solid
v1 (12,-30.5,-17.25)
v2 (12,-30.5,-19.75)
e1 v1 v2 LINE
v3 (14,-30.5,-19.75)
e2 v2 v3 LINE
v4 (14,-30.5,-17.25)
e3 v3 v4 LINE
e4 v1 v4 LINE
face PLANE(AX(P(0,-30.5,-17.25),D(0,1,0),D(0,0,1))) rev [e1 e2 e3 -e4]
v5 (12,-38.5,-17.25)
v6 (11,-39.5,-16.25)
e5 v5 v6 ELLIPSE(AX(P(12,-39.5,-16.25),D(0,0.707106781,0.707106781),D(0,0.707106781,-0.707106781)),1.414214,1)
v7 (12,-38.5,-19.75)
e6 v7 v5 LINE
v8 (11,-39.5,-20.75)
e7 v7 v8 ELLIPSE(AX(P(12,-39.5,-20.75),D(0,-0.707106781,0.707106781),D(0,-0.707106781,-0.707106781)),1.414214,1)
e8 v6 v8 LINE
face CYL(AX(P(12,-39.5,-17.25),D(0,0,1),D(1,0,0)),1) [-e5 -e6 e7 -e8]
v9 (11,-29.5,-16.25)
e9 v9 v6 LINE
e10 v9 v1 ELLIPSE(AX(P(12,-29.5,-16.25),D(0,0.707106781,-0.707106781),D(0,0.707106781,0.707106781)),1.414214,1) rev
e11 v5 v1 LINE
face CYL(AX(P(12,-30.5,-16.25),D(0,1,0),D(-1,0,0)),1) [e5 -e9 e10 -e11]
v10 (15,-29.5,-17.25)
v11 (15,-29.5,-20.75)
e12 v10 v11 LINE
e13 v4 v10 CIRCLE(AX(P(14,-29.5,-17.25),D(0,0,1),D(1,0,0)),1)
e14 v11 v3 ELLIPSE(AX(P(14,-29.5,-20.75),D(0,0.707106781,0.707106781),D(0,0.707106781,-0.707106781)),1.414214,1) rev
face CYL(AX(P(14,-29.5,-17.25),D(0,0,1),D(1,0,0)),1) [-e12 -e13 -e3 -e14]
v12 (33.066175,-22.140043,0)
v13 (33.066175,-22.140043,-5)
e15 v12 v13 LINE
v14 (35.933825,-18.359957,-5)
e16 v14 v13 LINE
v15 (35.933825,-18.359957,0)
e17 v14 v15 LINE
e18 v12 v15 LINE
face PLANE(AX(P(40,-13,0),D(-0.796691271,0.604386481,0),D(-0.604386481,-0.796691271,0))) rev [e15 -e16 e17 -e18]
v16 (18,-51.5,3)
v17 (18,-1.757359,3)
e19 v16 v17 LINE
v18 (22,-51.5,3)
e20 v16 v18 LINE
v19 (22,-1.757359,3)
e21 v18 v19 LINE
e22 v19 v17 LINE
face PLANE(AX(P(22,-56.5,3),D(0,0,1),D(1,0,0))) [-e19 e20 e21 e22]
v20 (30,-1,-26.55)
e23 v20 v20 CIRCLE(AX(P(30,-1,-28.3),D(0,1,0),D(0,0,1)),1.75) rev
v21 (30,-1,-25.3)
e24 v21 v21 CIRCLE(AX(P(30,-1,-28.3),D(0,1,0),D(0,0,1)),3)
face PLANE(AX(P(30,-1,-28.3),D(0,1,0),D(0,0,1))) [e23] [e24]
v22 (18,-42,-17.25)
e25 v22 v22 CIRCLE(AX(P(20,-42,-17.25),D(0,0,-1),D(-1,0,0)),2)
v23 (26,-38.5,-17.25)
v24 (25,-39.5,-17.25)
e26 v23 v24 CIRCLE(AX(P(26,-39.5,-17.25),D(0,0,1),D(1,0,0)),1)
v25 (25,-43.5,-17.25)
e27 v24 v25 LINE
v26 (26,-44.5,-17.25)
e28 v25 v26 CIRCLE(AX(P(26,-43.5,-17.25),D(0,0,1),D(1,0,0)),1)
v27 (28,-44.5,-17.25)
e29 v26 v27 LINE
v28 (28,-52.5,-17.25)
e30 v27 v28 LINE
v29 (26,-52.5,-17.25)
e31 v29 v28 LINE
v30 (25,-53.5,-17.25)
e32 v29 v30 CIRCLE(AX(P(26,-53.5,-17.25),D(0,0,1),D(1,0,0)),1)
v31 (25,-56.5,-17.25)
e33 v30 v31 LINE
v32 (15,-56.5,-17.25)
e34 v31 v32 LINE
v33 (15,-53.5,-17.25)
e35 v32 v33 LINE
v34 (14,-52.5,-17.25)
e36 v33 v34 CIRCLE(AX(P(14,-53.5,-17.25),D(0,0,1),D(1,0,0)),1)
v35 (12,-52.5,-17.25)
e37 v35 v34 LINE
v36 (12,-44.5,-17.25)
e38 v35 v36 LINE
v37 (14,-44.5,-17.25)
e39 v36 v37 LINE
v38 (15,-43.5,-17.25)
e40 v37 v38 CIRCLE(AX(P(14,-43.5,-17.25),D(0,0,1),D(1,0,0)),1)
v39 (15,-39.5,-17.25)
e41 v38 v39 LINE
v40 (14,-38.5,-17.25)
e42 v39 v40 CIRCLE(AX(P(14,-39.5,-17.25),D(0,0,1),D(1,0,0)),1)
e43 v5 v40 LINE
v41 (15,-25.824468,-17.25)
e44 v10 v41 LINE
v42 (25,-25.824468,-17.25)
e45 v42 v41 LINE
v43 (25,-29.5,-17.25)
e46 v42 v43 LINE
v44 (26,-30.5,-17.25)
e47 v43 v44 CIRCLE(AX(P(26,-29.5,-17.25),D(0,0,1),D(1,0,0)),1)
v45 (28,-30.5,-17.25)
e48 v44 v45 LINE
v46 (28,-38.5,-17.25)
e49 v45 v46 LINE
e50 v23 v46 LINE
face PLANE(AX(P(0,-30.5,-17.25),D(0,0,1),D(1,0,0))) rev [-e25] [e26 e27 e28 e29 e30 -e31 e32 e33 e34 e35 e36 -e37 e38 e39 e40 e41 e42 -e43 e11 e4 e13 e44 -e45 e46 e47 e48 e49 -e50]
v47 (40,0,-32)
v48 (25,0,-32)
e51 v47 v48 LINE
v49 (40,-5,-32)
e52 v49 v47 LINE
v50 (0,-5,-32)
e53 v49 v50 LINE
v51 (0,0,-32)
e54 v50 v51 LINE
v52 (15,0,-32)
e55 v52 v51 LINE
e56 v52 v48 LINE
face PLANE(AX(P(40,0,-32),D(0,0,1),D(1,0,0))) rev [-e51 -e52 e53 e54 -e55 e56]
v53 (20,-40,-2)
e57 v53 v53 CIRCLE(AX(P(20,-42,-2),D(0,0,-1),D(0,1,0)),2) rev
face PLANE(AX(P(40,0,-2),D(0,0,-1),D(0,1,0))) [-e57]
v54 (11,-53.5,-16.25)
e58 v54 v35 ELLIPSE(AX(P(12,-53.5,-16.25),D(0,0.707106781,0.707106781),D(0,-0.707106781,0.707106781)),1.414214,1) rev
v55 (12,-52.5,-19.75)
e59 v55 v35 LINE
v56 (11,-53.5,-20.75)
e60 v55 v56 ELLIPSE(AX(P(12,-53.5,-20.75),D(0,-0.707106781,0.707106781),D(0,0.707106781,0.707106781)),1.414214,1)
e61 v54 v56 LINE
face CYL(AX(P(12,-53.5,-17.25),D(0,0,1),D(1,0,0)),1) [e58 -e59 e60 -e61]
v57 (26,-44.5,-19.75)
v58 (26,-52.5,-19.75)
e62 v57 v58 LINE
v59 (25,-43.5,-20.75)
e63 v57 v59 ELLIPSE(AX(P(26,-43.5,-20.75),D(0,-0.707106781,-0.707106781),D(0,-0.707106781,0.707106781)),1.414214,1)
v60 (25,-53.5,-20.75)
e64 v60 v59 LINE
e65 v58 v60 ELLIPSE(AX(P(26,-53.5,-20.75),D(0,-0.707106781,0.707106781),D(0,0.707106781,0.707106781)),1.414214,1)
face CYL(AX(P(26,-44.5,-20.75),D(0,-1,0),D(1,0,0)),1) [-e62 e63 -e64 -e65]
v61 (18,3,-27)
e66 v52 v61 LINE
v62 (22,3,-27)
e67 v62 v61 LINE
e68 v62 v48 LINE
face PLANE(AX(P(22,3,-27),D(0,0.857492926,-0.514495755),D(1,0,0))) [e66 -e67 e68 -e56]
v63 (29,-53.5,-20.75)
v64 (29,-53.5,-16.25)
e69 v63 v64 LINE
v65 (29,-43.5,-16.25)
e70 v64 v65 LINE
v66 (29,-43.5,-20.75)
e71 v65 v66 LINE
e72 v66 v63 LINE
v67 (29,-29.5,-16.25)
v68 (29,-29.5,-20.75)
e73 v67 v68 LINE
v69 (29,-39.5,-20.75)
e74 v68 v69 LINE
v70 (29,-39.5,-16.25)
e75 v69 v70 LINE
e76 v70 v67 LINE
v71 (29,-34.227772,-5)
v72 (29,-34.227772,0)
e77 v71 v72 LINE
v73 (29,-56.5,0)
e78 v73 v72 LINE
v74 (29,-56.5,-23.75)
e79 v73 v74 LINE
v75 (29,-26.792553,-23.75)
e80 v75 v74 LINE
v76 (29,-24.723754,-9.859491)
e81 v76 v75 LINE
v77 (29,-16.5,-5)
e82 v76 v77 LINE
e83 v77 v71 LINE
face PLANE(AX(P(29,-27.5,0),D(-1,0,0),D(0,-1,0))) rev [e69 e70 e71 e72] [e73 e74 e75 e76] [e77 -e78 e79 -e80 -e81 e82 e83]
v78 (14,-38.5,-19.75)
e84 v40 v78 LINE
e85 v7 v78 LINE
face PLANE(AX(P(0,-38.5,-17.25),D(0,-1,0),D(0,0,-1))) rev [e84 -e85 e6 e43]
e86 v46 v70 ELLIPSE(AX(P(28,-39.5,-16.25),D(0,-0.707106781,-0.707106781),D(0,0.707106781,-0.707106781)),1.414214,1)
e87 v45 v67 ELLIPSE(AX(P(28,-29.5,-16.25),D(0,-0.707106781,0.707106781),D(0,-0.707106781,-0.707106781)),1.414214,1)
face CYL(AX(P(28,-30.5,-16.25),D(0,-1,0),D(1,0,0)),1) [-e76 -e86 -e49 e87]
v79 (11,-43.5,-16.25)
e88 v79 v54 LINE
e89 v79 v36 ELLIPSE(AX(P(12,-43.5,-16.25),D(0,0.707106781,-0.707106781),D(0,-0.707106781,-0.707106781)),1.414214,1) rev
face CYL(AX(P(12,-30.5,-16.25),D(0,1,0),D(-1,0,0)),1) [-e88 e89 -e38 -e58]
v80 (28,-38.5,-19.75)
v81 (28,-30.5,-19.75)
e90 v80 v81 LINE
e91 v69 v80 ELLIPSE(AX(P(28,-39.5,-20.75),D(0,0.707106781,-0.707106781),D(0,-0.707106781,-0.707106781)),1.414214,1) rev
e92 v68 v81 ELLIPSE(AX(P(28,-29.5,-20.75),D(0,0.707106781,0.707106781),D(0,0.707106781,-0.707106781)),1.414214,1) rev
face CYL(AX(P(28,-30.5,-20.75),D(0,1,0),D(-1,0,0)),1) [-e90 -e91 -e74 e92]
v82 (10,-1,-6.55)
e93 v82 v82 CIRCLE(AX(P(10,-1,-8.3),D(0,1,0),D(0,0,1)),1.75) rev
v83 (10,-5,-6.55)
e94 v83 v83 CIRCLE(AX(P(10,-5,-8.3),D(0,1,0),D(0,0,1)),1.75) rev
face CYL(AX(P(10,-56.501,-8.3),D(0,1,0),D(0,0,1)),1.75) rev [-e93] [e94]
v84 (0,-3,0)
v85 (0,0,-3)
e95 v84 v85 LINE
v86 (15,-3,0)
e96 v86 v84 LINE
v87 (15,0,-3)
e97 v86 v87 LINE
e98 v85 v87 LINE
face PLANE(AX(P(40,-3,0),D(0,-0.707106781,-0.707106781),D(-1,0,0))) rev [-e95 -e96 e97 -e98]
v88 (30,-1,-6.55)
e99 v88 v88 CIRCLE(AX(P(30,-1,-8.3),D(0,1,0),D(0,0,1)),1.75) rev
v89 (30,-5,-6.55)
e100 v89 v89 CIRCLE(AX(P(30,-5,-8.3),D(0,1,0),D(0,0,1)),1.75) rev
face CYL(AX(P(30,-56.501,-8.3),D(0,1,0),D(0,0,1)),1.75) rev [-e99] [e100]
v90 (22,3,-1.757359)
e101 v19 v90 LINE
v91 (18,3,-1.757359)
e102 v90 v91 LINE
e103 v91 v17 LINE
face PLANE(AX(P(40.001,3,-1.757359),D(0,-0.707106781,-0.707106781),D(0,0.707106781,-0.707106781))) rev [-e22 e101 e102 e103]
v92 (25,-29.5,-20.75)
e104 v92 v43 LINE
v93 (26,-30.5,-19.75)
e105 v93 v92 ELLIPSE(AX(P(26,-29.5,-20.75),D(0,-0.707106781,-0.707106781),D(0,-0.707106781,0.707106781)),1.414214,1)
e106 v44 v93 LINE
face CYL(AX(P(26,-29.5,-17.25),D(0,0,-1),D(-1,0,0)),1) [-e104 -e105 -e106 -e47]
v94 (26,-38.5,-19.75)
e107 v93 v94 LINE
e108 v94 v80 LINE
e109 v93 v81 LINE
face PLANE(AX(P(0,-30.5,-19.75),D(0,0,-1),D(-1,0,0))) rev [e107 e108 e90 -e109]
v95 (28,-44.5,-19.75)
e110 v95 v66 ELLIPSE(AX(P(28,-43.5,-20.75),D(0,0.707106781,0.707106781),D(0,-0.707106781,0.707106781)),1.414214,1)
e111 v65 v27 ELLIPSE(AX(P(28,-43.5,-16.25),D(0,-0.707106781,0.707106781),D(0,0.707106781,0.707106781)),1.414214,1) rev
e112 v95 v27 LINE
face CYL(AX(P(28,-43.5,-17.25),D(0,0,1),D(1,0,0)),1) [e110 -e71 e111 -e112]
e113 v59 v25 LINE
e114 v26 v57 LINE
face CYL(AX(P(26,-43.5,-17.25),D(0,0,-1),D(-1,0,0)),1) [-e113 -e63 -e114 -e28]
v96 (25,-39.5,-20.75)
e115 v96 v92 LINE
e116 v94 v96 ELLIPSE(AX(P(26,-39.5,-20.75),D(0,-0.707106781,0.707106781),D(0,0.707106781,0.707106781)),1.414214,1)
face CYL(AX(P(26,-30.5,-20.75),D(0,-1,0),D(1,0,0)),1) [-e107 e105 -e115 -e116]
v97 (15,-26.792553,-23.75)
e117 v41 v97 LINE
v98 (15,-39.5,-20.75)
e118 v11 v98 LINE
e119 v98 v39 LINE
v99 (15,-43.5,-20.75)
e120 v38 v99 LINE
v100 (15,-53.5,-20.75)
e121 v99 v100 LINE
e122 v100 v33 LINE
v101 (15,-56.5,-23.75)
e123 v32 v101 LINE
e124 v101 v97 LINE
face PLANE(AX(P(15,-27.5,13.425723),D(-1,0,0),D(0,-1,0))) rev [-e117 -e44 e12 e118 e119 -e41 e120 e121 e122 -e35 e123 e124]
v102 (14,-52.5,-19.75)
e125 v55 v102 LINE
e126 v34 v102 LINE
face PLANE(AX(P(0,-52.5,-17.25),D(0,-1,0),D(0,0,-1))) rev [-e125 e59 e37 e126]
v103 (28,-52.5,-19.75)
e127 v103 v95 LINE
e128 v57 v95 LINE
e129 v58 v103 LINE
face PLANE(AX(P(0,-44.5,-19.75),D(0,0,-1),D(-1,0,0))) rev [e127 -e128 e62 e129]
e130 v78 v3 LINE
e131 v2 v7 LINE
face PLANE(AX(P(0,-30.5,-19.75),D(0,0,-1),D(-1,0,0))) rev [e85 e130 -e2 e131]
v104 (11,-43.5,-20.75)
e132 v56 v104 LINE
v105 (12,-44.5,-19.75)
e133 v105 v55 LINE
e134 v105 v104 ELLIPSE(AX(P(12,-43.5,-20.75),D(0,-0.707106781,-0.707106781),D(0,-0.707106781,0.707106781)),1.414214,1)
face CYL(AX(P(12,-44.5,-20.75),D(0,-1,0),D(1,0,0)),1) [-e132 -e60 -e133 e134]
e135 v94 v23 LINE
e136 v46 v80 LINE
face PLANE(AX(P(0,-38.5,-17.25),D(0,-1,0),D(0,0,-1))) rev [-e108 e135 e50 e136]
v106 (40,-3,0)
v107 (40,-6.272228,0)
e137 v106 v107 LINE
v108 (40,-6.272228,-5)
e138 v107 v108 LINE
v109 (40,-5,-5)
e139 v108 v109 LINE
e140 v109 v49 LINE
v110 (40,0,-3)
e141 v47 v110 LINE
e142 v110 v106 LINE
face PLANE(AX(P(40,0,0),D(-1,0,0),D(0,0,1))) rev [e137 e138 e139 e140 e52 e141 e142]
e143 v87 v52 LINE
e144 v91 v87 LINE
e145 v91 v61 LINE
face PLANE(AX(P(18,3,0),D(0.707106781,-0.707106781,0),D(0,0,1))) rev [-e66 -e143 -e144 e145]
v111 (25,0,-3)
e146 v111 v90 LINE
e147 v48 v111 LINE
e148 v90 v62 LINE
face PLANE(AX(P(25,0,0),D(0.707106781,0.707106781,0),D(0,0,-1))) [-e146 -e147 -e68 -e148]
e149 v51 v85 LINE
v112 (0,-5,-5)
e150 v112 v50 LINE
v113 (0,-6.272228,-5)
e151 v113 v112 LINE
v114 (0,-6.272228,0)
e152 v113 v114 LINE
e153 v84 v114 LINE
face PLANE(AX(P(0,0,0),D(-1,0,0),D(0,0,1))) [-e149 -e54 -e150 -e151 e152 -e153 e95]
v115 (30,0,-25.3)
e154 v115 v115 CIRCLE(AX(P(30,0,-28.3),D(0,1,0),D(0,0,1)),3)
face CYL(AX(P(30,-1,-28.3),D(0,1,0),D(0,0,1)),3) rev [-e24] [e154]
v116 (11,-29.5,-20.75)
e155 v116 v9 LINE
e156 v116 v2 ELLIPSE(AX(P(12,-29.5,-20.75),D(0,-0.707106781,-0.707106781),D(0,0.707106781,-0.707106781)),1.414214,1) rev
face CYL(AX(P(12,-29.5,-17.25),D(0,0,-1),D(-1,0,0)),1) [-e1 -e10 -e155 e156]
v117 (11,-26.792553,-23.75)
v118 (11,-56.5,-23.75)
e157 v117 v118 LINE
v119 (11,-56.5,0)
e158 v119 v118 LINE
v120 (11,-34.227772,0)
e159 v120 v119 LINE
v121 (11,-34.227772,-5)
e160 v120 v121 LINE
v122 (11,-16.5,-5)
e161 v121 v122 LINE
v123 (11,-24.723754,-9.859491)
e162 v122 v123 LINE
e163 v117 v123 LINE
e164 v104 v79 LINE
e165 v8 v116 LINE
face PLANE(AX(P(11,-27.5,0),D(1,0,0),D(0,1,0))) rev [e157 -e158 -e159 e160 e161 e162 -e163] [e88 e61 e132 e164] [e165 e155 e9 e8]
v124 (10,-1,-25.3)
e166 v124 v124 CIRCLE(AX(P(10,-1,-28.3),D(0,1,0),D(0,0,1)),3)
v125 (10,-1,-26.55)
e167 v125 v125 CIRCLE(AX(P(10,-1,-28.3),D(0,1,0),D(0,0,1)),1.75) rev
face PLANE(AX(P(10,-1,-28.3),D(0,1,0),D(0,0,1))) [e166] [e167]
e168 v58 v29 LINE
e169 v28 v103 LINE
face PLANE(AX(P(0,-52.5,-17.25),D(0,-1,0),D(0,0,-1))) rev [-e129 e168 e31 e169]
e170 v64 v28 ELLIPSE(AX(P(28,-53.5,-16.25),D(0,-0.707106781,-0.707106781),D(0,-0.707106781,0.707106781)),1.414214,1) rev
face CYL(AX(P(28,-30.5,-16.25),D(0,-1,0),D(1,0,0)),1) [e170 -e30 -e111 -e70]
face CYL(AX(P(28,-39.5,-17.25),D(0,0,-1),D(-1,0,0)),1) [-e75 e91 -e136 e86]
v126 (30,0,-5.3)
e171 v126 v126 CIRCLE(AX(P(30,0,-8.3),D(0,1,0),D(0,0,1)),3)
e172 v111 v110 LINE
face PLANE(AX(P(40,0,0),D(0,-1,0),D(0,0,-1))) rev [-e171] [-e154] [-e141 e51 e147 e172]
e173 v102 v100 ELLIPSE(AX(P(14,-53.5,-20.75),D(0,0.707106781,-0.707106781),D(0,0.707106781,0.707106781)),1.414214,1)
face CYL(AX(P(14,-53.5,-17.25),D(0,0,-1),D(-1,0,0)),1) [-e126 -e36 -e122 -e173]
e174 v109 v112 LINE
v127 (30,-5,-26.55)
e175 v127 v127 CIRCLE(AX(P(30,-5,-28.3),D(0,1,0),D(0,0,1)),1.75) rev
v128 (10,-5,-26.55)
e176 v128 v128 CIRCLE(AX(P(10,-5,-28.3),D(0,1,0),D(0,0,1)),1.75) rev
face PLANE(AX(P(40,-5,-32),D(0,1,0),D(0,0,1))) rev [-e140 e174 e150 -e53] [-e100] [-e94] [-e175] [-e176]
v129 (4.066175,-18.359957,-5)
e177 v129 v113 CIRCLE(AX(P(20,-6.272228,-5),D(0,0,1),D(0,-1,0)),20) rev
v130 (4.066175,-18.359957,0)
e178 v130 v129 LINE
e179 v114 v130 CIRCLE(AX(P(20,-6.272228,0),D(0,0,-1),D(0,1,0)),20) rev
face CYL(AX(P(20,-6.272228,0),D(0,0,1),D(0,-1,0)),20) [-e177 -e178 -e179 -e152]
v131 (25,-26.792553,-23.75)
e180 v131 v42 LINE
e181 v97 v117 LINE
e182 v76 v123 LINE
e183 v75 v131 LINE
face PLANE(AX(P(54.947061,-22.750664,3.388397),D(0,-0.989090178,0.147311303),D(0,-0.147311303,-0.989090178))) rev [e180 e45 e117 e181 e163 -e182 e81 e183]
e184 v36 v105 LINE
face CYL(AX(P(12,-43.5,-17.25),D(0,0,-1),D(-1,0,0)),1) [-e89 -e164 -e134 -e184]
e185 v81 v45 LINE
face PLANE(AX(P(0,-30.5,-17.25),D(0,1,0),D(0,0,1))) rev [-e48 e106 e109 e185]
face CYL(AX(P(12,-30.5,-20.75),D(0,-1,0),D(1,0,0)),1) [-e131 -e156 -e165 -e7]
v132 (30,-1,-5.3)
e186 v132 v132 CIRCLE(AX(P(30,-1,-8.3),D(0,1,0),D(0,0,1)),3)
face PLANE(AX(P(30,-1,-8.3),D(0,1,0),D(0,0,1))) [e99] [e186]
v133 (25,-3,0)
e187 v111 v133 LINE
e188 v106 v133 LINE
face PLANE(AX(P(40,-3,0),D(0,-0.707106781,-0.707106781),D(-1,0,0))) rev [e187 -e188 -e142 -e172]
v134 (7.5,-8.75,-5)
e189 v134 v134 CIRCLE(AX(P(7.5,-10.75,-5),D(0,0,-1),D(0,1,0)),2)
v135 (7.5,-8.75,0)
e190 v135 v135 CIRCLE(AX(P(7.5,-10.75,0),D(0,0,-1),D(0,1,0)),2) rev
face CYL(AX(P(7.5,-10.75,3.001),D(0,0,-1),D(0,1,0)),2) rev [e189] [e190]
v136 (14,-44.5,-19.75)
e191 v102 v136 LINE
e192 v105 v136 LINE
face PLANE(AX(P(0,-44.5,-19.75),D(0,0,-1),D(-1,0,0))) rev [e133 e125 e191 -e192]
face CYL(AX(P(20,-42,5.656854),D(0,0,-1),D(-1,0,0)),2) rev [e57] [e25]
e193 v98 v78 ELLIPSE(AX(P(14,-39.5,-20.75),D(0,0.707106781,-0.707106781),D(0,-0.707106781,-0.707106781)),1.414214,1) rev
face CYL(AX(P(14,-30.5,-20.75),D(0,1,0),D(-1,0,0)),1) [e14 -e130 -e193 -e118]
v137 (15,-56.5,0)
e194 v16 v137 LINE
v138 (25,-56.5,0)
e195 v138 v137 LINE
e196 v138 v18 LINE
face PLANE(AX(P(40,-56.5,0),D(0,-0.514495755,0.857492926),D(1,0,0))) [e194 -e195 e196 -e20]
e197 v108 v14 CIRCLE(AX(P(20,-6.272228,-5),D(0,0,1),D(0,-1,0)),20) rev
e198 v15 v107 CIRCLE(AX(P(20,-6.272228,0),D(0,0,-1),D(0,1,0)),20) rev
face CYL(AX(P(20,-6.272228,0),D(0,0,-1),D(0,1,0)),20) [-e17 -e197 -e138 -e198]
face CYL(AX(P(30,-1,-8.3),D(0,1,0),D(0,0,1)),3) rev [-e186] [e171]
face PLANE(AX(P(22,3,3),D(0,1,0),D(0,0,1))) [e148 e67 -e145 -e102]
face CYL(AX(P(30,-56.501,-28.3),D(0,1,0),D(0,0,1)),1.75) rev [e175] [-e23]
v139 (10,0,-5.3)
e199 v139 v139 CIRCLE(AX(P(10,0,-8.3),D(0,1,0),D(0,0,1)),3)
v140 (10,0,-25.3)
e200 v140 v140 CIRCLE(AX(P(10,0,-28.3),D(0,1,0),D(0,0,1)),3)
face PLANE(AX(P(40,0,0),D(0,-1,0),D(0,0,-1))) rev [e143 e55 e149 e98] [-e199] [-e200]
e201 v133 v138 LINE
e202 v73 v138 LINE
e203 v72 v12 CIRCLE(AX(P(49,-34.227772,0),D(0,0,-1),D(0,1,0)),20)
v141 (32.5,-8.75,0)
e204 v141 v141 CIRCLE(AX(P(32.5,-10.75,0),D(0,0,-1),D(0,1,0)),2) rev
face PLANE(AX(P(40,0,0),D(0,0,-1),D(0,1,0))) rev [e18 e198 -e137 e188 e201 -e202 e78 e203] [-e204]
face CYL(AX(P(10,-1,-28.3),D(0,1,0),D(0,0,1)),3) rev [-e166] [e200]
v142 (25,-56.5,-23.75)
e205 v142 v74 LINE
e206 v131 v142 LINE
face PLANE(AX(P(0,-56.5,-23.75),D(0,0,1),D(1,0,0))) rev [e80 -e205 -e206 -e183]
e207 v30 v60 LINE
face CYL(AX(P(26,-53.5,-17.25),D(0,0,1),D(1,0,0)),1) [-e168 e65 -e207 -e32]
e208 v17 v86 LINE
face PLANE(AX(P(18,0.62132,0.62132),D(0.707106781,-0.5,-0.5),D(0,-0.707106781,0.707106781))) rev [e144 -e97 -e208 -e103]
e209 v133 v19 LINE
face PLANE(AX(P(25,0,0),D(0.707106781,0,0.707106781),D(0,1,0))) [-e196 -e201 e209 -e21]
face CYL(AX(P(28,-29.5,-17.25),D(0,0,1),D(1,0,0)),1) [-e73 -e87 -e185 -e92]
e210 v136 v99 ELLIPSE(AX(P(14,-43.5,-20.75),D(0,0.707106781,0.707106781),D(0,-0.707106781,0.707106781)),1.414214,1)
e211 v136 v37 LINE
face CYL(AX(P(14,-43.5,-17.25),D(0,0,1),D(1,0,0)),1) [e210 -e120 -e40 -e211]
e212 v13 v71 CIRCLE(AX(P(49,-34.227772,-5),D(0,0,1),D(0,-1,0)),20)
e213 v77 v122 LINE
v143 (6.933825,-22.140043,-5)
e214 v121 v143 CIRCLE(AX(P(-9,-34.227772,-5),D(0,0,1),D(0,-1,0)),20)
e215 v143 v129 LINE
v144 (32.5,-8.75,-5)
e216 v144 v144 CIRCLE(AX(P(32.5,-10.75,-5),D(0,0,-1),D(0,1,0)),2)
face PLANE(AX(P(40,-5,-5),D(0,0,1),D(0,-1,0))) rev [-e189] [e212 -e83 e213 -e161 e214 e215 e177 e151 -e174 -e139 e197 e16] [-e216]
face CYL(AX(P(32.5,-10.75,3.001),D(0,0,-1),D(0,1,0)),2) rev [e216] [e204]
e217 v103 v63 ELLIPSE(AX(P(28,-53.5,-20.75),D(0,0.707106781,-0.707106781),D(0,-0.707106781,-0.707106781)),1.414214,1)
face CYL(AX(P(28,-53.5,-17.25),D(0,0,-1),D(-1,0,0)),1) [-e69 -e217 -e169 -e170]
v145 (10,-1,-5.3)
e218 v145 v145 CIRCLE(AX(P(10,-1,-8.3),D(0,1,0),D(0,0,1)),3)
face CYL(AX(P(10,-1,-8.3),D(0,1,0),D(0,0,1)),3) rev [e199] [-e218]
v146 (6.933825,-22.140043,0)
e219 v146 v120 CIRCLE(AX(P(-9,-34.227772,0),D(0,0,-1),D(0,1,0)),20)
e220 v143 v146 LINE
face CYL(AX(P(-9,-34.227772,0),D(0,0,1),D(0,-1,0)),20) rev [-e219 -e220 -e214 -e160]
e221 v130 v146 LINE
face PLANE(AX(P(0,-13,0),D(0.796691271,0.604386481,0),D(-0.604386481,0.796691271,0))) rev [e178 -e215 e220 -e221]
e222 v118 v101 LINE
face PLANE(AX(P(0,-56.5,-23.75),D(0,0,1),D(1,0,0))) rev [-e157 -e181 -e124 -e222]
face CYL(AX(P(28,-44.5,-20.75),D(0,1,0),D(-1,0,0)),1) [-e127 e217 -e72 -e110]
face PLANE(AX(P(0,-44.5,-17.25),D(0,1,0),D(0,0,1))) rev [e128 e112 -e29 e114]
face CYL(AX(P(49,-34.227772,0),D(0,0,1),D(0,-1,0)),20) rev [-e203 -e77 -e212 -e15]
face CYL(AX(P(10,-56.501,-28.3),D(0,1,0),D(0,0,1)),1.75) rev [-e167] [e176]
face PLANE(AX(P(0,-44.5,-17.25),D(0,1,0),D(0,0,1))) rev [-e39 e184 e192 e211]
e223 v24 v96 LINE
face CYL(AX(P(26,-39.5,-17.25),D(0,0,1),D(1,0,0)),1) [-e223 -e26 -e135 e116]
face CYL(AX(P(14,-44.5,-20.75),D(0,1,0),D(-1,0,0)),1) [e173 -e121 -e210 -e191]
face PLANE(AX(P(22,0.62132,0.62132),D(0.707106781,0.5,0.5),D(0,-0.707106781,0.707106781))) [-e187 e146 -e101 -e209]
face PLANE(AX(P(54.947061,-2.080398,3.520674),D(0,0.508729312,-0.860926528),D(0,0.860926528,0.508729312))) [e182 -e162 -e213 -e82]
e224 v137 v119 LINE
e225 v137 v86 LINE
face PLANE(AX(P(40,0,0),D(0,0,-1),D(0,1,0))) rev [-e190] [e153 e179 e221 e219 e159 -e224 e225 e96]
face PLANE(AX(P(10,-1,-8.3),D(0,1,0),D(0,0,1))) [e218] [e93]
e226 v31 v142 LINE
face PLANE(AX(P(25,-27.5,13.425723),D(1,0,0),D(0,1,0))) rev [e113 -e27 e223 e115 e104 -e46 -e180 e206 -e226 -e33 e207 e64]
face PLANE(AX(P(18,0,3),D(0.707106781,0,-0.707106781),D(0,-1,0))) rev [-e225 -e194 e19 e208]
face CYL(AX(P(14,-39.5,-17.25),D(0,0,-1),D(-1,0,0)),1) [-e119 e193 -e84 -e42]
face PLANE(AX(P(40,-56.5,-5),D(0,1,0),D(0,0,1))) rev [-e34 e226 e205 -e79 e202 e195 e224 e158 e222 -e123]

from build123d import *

# Parameters (mm, degrees)
BOSS_EXTRUDE1_DEPTH      = 40
SKETCH2_W                = 40
SKETCH2_H                = 29
BOSS_EXTRUDE2_DEPTH      = 23.5
SKETCH3_W                = 2.5
SKETCH3_H                = 8
CUT_EXTRUDE1_DEPTH       = 77.264342913
CUT_EXTRUDE2_REACH       = 76.863
SKETCH4_W                = 10
SKETCH4_H                = 29
CUT_EXTRUDE3_DEPTH       = 75.863208587
FILLET1_R                = 20
SKETCH6_R                = 2
CUT_EXTRUDE4_DEPTH       = 15.25
CUT_EXTRUDE5_REACH       = 78.264
SKETCH7_R                = 1.75
SKETCH8_R                = 3
CUT_EXTRUDE6_DEPTH       = 1
BOSS_EXTRUDE4_DEPTH      = 2
BOSS_EXTRUDE4_DEPTH_BACK = 2
CHAMFER1_SIZE            = 3
CHAMFER1_SIZE2           = 5
CHAMFER2_SIZE            = 5
CHAMFER2_SIZE2           = 3
CHAMFER3_SIZE            = 3
CHAMFER4_SIZE            = 3
CUT_EXTRUDE7_REACH       = 70.558
BOSS_EXTRUDE5_REACH      = 73.114
SKETCH12_W               = 10
SKETCH12_H               = 11.25
CUT_EXTRUDE8_DEPTH       = 2
FILLET2_R                = 1
SKETCH13_W               = 4.75
SKETCH13_H               = 32.080750089
CUT_EXTRUDE9_DEPTH       = 72.114344545
CUT_EXTRUDE10_REACH      = 76.305
SKETCH14_R               = 2


with BuildPart() as part:
    # Sketch1 → Boss-Extrude1 (new body)
    with BuildSketch(Plane(origin=(0, 0, 0), x_dir=(0, 0, -1), z_dir=(1, 0, 0))):
        Polygon((0, 0), (0, -56.5), (5, -56.5), (5, -5), (32, -5), (32, 0), align=None)
    extrude(amount=BOSS_EXTRUDE1_DEPTH)

    # Sketch2 → Boss-Extrude2 (add)
    with BuildSketch(Plane(origin=(0, 0, -5), x_dir=(-1, 0, 0), z_dir=(0, 0, -1))):
        with Locations((-20, -42)):
            Rectangle(SKETCH2_W, SKETCH2_H)
    extrude(amount=BOSS_EXTRUDE2_DEPTH)

    # Sketch3 → Cut-Extrude1 (cut, through all)
    with BuildSketch(Plane(origin=(40, 0, 0), x_dir=(0, 0, -1), z_dir=(1, 0, 0))):
        with Locations((18.5, -34.5)):
            Rectangle(SKETCH3_W, SKETCH3_H)
        with Locations((18.5, -48.5)):
            Rectangle(SKETCH3_W, SKETCH3_H)
    extrude(amount=-CUT_EXTRUDE1_DEPTH, mode=Mode.SUBTRACT)

    # Cut-Extrude2: up to this face of the body (flat: up to its plane)
    cut_extrude2_end = Plane(part.part.faces().sort_by_distance((20, -34.5, -17.25))[0])
    # Sketch4 → Cut-Extrude2 (cut, up to the picked face)
    with BuildSketch(Plane(origin=(0, 0, -28.5), x_dir=(-1, 0, 0), z_dir=(0, 0, -1)), mode=Mode.PRIVATE) as cut_extrude2_sk1:
        with Locations((-20, -42)):
            Rectangle(SKETCH4_W, SKETCH4_H)
    cut_extrude2_tool1 = split(extrude(cut_extrude2_sk1.sketch, amount=-CUT_EXTRUDE2_REACH, mode=Mode.PRIVATE), bisect_by=cut_extrude2_end, keep=Keep.BOTH, mode=Mode.PRIVATE)
    add(cut_extrude2_tool1.solids().sort_by(Axis((20, -42, -28.5), (0, 0, 1)))[0], mode=Mode.SUBTRACT)

    # Sketch5 → Cut-Extrude3 (cut, through all)
    with BuildSketch(Plane(origin=(0, 0, -28.5), x_dir=(-1, 0, 0), z_dir=(0, 0, -1))):
        Polygon((-29, -27.5), (-29, -56.5), (-40, -56.5), (-40, -13), align=None)
        Polygon((0, -56.5), (0, -13), (-11, -27.5), (-11, -56.5), align=None)
    extrude(amount=-CUT_EXTRUDE3_DEPTH, mode=Mode.SUBTRACT)

    # Fillet1
    fillet1_edges = [part.edges().sort_by_distance(p)[0] for p in [
        (40, -13, -2.5),
        (29, -27.5, -2.5),
        (11, -27.5, -2.5),
        (0, -13, -2.5),
    ]]
    fillet(fillet1_edges, radius=FILLET1_R)

    # Sketch6 → Cut-Extrude4 (cut)
    with BuildSketch(Plane(origin=(0, 0, -17.25), x_dir=(-1, 0, 0), z_dir=(0, 0, -1))):
        with Locations((-20, -42)):
            Circle(SKETCH6_R)
    extrude(amount=-CUT_EXTRUDE4_DEPTH, mode=Mode.SUBTRACT)

    # Sketch7 → Cut-Extrude5 (cut, up to next)
    with BuildSketch(Plane(origin=(0, 0, 0), x_dir=(1, 0, 0), z_dir=(0, 1, 0)), mode=Mode.PRIVATE) as cut_extrude5_sk1:
        with Locations(Location((30, 28.3, 0), (0, 0, 270))):
            Circle(SKETCH7_R)
    cut_extrude5_tool1 = extrude(cut_extrude5_sk1.sketch, amount=-CUT_EXTRUDE5_REACH, mode=Mode.PRIVATE) & part.part
    # Sketch7 → Cut-Extrude5 (cut, up to next)
    with BuildSketch(Plane(origin=(0, 0, 0), x_dir=(1, 0, 0), z_dir=(0, 1, 0)), mode=Mode.PRIVATE) as cut_extrude5_sk2:
        with Locations(Location((30, 8.3, 0), (0, 0, 270))):
            Circle(SKETCH7_R)
    cut_extrude5_tool2 = extrude(cut_extrude5_sk2.sketch, amount=-CUT_EXTRUDE5_REACH, mode=Mode.PRIVATE) & part.part
    # Sketch7 → Cut-Extrude5 (cut, up to next)
    with BuildSketch(Plane(origin=(0, 0, 0), x_dir=(1, 0, 0), z_dir=(0, 1, 0)), mode=Mode.PRIVATE) as cut_extrude5_sk3:
        with Locations(Location((10, 8.3, 0), (0, 0, 270))):
            Circle(SKETCH7_R)
    cut_extrude5_tool3 = extrude(cut_extrude5_sk3.sketch, amount=-CUT_EXTRUDE5_REACH, mode=Mode.PRIVATE) & part.part
    # Sketch7 → Cut-Extrude5 (cut, up to next)
    with BuildSketch(Plane(origin=(0, 0, 0), x_dir=(1, 0, 0), z_dir=(0, 1, 0)), mode=Mode.PRIVATE) as cut_extrude5_sk4:
        with Locations(Location((10, 28.3, 0), (0, 0, 270))):
            Circle(SKETCH7_R)
    cut_extrude5_tool4 = extrude(cut_extrude5_sk4.sketch, amount=-CUT_EXTRUDE5_REACH, mode=Mode.PRIVATE) & part.part
    add(cut_extrude5_tool1.solids().sort_by_distance((30, 0, -28.3))[0], mode=Mode.SUBTRACT)
    add(cut_extrude5_tool2.solids().sort_by_distance((30, 0, -8.3))[0], mode=Mode.SUBTRACT)
    add(cut_extrude5_tool3.solids().sort_by_distance((10, 0, -8.3))[0], mode=Mode.SUBTRACT)
    add(cut_extrude5_tool4.solids().sort_by_distance((10, 0, -28.3))[0], mode=Mode.SUBTRACT)

    # Sketch8 → Cut-Extrude6 (cut)
    with BuildSketch(Plane(origin=(0, 0, 0), x_dir=(1, 0, 0), z_dir=(0, 1, 0))):
        with Locations(Location((30, 28.3, 0), (0, 0, 270))):
            Circle(SKETCH8_R)
        with Locations(Location((30, 8.3, 0), (0, 0, 270))):
            Circle(SKETCH8_R)
        with Locations(Location((10, 8.3, 0), (0, 0, 270))):
            Circle(SKETCH8_R)
        with Locations(Location((10, 28.3, 0), (0, 0, 270))):
            Circle(SKETCH8_R)
    extrude(amount=-CUT_EXTRUDE6_DEPTH, mode=Mode.SUBTRACT)

    # Sketch9 → Boss-Extrude4 (add, two sides: drawn at the far end of the back side and taken through both)
    with BuildSketch(Plane.ZY.offset(-20).offset(-BOSS_EXTRUDE4_DEPTH_BACK)):
        Polygon((-32, 0), (0, 0), (0, -56.5), (3, -56.5), (3, 3), (-32, 3), align=None)
    extrude(amount=BOSS_EXTRUDE4_DEPTH + BOSS_EXTRUDE4_DEPTH_BACK)

    # Chamfer1
    chamfer1_edges = [part.edges().sort_by_distance(p)[0] for p in [
        (20, 3, -32),
    ]]
    chamfer1_side = [part.faces().sort_by_distance(p)[0] for p in [
        (20, -2.273584906, -32),
    ]]
    chamfer(chamfer1_edges, length=CHAMFER1_SIZE, length2=CHAMFER1_SIZE2, reference=chamfer1_side[0])

    # Chamfer2
    chamfer2_edges = [part.edges().sort_by_distance(p)[0] for p in [
        (20, -56.5, 3),
    ]]
    chamfer2_side = [part.faces().sort_by_distance(p)[0] for p in [
        (20, -26.75, 3),
    ]]
    chamfer(chamfer2_edges, length=CHAMFER2_SIZE, length2=CHAMFER2_SIZE2, reference=chamfer2_side[0])

    # Chamfer3
    chamfer3_edges = [part.edges().sort_by_distance(p)[0] for p in [
        (31, 0, 0),
        (9, 0, 0),
        (20, 3, 3),
    ]]
    chamfer(chamfer3_edges, length=CHAMFER3_SIZE)

    # Chamfer4
    chamfer4_edges = [part.edges().sort_by_distance(p)[0] for p in [
        (18, -29.75, 0),
        (18, -1.5, -1.5),
        (18, 0, -17.5),
        (22, -29.75, 0),
        (22, -1.5, -1.5),
        (22, 0, -17.5),
    ]]
    chamfer(chamfer4_edges, length=CHAMFER4_SIZE - 0.0001)  # a hair under: the kernel refuses the full size

    # Cut-Extrude7: up to this plane
    cut_extrude7_end = Plane(origin=(22, 0.621320344, 0.621320344), z_dir=(0.7071067811865434, 0.500000000000003, 0.500000000000003))
    # Sketch10 → Cut-Extrude7 (cut, up to the surface)
    with BuildSketch(Plane.ZY.offset(-18), mode=Mode.PRIVATE) as cut_extrude7_sk1:
        Polygon((-1.757359313, 3), (3, -1.757359313), (3, 0), (0, 3), align=None)
    cut_extrude7_tool1 = split(extrude(cut_extrude7_sk1.sketch, amount=-CUT_EXTRUDE7_REACH, mode=Mode.PRIVATE), bisect_by=cut_extrude7_end, keep=Keep.BOTH, mode=Mode.PRIVATE)
    add(cut_extrude7_tool1.solids().sort_by_distance((18, 1.027484, 1.027484))[0], mode=Mode.SUBTRACT)


with BuildPart() as cut_extrude7_kept_piece:
    # of the separate pieces the step leaves, the one the design keeps (cut_extrude7_pieces_kept)
    add(part.part.solids().sort_by_distance((18, -1.757400734, 2.9999))[0])

    # Boss-Extrude5: up to this face of the body (flat: up to its plane)
    boss_extrude5_end = Plane(cut_extrude7_kept_piece.part.faces().sort_by_distance((29, -42.52414206, -14.549200751))[0])
    # Sketch11 → Boss-Extrude5 (add, up to the picked face)
    with BuildSketch(Plane.ZY.offset(-11), mode=Mode.PRIVATE) as boss_extrude5_sk1:
        Polygon((-28.5, -27.5), (-9.859490986, -24.723753977), (-5, -16.5), (-5, -27.5), align=None)
    boss_extrude5_tool1 = split(extrude(boss_extrude5_sk1.sketch, amount=-BOSS_EXTRUDE5_REACH, mode=Mode.PRIVATE), bisect_by=boss_extrude5_end, keep=Keep.BOTH, mode=Mode.PRIVATE)
    add(boss_extrude5_tool1.solids().sort_by(Axis((11, -24.923314, -10.92545), (1, 0, 0)))[0])

    # Sketch12 → Cut-Extrude8 (cut)
    with BuildSketch(Plane.XZ.offset(27.5)):
        with Locations((20, -22.875)):
            Rectangle(SKETCH12_W, SKETCH12_H)
    extrude(amount=-CUT_EXTRUDE8_DEPTH, mode=Mode.SUBTRACT)

    # Fillet2
    fillet2_edges = [cut_extrude7_kept_piece.edges().sort_by_distance(p)[0] for p in [
        (29, -30.5, -18.5),
        (11, -34.5, -17.25),
        (11, -48.5, -17.25),
        (29, -38.5, -18.5),
        (29, -34.5, -19.75),
        (29, -34.5, -17.25),
        (29, -52.5, -18.5),
        (29, -48.5, -19.75),
        (29, -44.5, -18.5),
        (29, -48.5, -17.25),
        (11, -30.5, -18.5),
        (11, -34.5, -19.75),
        (11, -38.5, -18.5),
        (11, -44.5, -18.5),
        (11, -48.5, -19.75),
        (11, -52.5, -18.5),
        (25, -30.5, -18.5),
        (15, -30.5, -18.5),
        (15, -52.5, -18.5),
        (15, -48.5, -19.75),
        (15, -44.5, -18.5),
        (15, -38.5, -18.5),
        (15, -34.5, -19.75),
        (25, -48.5, -19.75),
        (25, -52.5, -18.5),
        (25, -34.5, -19.75),
        (25, -38.5, -18.5),
        (25, -44.5, -18.5),
    ]]
    fillet(fillet2_edges, radius=FILLET2_R)

    # Sketch13 → Cut-Extrude9 (cut, through all)
    with BuildSketch(Plane(origin=(29, 0, 0), x_dir=(0, 0, -1), z_dir=(1, 0, 0))):
        with Locations((26.125, -40.459624956)):
            Rectangle(SKETCH13_W, SKETCH13_H)
    extrude(amount=-CUT_EXTRUDE9_DEPTH, mode=Mode.SUBTRACT)

    # Sketch14 → Cut-Extrude10 (cut, up to next)
    with BuildSketch(Plane(origin=(0, 0, -5), x_dir=(-1, 0, 0), z_dir=(0, 0, -1)), mode=Mode.PRIVATE) as cut_extrude10_sk1:
        with Locations(Location((-32.5, -10.75, 0), (0, 0, 90))):
            Circle(SKETCH14_R)
    cut_extrude10_tool1 = extrude(cut_extrude10_sk1.sketch, amount=-CUT_EXTRUDE10_REACH, mode=Mode.PRIVATE) & cut_extrude7_kept_piece.part
    # Sketch14 → Cut-Extrude10 (cut, up to next)
    with BuildSketch(Plane(origin=(0, 0, -5), x_dir=(-1, 0, 0), z_dir=(0, 0, -1)), mode=Mode.PRIVATE) as cut_extrude10_sk2:
        with Locations(Location((-7.5, -10.75, 0), (0, 0, 90))):
            Circle(SKETCH14_R)
    cut_extrude10_tool2 = extrude(cut_extrude10_sk2.sketch, amount=-CUT_EXTRUDE10_REACH, mode=Mode.PRIVATE) & cut_extrude7_kept_piece.part
    add(cut_extrude10_tool1.solids().sort_by_distance((32.5, -10.75, -5))[0], mode=Mode.SUBTRACT)
    add(cut_extrude10_tool2.solids().sort_by_distance((7.5, -10.75, -5))[0], mode=Mode.SUBTRACT)


solid = cut_extrude7_kept_piece.part
